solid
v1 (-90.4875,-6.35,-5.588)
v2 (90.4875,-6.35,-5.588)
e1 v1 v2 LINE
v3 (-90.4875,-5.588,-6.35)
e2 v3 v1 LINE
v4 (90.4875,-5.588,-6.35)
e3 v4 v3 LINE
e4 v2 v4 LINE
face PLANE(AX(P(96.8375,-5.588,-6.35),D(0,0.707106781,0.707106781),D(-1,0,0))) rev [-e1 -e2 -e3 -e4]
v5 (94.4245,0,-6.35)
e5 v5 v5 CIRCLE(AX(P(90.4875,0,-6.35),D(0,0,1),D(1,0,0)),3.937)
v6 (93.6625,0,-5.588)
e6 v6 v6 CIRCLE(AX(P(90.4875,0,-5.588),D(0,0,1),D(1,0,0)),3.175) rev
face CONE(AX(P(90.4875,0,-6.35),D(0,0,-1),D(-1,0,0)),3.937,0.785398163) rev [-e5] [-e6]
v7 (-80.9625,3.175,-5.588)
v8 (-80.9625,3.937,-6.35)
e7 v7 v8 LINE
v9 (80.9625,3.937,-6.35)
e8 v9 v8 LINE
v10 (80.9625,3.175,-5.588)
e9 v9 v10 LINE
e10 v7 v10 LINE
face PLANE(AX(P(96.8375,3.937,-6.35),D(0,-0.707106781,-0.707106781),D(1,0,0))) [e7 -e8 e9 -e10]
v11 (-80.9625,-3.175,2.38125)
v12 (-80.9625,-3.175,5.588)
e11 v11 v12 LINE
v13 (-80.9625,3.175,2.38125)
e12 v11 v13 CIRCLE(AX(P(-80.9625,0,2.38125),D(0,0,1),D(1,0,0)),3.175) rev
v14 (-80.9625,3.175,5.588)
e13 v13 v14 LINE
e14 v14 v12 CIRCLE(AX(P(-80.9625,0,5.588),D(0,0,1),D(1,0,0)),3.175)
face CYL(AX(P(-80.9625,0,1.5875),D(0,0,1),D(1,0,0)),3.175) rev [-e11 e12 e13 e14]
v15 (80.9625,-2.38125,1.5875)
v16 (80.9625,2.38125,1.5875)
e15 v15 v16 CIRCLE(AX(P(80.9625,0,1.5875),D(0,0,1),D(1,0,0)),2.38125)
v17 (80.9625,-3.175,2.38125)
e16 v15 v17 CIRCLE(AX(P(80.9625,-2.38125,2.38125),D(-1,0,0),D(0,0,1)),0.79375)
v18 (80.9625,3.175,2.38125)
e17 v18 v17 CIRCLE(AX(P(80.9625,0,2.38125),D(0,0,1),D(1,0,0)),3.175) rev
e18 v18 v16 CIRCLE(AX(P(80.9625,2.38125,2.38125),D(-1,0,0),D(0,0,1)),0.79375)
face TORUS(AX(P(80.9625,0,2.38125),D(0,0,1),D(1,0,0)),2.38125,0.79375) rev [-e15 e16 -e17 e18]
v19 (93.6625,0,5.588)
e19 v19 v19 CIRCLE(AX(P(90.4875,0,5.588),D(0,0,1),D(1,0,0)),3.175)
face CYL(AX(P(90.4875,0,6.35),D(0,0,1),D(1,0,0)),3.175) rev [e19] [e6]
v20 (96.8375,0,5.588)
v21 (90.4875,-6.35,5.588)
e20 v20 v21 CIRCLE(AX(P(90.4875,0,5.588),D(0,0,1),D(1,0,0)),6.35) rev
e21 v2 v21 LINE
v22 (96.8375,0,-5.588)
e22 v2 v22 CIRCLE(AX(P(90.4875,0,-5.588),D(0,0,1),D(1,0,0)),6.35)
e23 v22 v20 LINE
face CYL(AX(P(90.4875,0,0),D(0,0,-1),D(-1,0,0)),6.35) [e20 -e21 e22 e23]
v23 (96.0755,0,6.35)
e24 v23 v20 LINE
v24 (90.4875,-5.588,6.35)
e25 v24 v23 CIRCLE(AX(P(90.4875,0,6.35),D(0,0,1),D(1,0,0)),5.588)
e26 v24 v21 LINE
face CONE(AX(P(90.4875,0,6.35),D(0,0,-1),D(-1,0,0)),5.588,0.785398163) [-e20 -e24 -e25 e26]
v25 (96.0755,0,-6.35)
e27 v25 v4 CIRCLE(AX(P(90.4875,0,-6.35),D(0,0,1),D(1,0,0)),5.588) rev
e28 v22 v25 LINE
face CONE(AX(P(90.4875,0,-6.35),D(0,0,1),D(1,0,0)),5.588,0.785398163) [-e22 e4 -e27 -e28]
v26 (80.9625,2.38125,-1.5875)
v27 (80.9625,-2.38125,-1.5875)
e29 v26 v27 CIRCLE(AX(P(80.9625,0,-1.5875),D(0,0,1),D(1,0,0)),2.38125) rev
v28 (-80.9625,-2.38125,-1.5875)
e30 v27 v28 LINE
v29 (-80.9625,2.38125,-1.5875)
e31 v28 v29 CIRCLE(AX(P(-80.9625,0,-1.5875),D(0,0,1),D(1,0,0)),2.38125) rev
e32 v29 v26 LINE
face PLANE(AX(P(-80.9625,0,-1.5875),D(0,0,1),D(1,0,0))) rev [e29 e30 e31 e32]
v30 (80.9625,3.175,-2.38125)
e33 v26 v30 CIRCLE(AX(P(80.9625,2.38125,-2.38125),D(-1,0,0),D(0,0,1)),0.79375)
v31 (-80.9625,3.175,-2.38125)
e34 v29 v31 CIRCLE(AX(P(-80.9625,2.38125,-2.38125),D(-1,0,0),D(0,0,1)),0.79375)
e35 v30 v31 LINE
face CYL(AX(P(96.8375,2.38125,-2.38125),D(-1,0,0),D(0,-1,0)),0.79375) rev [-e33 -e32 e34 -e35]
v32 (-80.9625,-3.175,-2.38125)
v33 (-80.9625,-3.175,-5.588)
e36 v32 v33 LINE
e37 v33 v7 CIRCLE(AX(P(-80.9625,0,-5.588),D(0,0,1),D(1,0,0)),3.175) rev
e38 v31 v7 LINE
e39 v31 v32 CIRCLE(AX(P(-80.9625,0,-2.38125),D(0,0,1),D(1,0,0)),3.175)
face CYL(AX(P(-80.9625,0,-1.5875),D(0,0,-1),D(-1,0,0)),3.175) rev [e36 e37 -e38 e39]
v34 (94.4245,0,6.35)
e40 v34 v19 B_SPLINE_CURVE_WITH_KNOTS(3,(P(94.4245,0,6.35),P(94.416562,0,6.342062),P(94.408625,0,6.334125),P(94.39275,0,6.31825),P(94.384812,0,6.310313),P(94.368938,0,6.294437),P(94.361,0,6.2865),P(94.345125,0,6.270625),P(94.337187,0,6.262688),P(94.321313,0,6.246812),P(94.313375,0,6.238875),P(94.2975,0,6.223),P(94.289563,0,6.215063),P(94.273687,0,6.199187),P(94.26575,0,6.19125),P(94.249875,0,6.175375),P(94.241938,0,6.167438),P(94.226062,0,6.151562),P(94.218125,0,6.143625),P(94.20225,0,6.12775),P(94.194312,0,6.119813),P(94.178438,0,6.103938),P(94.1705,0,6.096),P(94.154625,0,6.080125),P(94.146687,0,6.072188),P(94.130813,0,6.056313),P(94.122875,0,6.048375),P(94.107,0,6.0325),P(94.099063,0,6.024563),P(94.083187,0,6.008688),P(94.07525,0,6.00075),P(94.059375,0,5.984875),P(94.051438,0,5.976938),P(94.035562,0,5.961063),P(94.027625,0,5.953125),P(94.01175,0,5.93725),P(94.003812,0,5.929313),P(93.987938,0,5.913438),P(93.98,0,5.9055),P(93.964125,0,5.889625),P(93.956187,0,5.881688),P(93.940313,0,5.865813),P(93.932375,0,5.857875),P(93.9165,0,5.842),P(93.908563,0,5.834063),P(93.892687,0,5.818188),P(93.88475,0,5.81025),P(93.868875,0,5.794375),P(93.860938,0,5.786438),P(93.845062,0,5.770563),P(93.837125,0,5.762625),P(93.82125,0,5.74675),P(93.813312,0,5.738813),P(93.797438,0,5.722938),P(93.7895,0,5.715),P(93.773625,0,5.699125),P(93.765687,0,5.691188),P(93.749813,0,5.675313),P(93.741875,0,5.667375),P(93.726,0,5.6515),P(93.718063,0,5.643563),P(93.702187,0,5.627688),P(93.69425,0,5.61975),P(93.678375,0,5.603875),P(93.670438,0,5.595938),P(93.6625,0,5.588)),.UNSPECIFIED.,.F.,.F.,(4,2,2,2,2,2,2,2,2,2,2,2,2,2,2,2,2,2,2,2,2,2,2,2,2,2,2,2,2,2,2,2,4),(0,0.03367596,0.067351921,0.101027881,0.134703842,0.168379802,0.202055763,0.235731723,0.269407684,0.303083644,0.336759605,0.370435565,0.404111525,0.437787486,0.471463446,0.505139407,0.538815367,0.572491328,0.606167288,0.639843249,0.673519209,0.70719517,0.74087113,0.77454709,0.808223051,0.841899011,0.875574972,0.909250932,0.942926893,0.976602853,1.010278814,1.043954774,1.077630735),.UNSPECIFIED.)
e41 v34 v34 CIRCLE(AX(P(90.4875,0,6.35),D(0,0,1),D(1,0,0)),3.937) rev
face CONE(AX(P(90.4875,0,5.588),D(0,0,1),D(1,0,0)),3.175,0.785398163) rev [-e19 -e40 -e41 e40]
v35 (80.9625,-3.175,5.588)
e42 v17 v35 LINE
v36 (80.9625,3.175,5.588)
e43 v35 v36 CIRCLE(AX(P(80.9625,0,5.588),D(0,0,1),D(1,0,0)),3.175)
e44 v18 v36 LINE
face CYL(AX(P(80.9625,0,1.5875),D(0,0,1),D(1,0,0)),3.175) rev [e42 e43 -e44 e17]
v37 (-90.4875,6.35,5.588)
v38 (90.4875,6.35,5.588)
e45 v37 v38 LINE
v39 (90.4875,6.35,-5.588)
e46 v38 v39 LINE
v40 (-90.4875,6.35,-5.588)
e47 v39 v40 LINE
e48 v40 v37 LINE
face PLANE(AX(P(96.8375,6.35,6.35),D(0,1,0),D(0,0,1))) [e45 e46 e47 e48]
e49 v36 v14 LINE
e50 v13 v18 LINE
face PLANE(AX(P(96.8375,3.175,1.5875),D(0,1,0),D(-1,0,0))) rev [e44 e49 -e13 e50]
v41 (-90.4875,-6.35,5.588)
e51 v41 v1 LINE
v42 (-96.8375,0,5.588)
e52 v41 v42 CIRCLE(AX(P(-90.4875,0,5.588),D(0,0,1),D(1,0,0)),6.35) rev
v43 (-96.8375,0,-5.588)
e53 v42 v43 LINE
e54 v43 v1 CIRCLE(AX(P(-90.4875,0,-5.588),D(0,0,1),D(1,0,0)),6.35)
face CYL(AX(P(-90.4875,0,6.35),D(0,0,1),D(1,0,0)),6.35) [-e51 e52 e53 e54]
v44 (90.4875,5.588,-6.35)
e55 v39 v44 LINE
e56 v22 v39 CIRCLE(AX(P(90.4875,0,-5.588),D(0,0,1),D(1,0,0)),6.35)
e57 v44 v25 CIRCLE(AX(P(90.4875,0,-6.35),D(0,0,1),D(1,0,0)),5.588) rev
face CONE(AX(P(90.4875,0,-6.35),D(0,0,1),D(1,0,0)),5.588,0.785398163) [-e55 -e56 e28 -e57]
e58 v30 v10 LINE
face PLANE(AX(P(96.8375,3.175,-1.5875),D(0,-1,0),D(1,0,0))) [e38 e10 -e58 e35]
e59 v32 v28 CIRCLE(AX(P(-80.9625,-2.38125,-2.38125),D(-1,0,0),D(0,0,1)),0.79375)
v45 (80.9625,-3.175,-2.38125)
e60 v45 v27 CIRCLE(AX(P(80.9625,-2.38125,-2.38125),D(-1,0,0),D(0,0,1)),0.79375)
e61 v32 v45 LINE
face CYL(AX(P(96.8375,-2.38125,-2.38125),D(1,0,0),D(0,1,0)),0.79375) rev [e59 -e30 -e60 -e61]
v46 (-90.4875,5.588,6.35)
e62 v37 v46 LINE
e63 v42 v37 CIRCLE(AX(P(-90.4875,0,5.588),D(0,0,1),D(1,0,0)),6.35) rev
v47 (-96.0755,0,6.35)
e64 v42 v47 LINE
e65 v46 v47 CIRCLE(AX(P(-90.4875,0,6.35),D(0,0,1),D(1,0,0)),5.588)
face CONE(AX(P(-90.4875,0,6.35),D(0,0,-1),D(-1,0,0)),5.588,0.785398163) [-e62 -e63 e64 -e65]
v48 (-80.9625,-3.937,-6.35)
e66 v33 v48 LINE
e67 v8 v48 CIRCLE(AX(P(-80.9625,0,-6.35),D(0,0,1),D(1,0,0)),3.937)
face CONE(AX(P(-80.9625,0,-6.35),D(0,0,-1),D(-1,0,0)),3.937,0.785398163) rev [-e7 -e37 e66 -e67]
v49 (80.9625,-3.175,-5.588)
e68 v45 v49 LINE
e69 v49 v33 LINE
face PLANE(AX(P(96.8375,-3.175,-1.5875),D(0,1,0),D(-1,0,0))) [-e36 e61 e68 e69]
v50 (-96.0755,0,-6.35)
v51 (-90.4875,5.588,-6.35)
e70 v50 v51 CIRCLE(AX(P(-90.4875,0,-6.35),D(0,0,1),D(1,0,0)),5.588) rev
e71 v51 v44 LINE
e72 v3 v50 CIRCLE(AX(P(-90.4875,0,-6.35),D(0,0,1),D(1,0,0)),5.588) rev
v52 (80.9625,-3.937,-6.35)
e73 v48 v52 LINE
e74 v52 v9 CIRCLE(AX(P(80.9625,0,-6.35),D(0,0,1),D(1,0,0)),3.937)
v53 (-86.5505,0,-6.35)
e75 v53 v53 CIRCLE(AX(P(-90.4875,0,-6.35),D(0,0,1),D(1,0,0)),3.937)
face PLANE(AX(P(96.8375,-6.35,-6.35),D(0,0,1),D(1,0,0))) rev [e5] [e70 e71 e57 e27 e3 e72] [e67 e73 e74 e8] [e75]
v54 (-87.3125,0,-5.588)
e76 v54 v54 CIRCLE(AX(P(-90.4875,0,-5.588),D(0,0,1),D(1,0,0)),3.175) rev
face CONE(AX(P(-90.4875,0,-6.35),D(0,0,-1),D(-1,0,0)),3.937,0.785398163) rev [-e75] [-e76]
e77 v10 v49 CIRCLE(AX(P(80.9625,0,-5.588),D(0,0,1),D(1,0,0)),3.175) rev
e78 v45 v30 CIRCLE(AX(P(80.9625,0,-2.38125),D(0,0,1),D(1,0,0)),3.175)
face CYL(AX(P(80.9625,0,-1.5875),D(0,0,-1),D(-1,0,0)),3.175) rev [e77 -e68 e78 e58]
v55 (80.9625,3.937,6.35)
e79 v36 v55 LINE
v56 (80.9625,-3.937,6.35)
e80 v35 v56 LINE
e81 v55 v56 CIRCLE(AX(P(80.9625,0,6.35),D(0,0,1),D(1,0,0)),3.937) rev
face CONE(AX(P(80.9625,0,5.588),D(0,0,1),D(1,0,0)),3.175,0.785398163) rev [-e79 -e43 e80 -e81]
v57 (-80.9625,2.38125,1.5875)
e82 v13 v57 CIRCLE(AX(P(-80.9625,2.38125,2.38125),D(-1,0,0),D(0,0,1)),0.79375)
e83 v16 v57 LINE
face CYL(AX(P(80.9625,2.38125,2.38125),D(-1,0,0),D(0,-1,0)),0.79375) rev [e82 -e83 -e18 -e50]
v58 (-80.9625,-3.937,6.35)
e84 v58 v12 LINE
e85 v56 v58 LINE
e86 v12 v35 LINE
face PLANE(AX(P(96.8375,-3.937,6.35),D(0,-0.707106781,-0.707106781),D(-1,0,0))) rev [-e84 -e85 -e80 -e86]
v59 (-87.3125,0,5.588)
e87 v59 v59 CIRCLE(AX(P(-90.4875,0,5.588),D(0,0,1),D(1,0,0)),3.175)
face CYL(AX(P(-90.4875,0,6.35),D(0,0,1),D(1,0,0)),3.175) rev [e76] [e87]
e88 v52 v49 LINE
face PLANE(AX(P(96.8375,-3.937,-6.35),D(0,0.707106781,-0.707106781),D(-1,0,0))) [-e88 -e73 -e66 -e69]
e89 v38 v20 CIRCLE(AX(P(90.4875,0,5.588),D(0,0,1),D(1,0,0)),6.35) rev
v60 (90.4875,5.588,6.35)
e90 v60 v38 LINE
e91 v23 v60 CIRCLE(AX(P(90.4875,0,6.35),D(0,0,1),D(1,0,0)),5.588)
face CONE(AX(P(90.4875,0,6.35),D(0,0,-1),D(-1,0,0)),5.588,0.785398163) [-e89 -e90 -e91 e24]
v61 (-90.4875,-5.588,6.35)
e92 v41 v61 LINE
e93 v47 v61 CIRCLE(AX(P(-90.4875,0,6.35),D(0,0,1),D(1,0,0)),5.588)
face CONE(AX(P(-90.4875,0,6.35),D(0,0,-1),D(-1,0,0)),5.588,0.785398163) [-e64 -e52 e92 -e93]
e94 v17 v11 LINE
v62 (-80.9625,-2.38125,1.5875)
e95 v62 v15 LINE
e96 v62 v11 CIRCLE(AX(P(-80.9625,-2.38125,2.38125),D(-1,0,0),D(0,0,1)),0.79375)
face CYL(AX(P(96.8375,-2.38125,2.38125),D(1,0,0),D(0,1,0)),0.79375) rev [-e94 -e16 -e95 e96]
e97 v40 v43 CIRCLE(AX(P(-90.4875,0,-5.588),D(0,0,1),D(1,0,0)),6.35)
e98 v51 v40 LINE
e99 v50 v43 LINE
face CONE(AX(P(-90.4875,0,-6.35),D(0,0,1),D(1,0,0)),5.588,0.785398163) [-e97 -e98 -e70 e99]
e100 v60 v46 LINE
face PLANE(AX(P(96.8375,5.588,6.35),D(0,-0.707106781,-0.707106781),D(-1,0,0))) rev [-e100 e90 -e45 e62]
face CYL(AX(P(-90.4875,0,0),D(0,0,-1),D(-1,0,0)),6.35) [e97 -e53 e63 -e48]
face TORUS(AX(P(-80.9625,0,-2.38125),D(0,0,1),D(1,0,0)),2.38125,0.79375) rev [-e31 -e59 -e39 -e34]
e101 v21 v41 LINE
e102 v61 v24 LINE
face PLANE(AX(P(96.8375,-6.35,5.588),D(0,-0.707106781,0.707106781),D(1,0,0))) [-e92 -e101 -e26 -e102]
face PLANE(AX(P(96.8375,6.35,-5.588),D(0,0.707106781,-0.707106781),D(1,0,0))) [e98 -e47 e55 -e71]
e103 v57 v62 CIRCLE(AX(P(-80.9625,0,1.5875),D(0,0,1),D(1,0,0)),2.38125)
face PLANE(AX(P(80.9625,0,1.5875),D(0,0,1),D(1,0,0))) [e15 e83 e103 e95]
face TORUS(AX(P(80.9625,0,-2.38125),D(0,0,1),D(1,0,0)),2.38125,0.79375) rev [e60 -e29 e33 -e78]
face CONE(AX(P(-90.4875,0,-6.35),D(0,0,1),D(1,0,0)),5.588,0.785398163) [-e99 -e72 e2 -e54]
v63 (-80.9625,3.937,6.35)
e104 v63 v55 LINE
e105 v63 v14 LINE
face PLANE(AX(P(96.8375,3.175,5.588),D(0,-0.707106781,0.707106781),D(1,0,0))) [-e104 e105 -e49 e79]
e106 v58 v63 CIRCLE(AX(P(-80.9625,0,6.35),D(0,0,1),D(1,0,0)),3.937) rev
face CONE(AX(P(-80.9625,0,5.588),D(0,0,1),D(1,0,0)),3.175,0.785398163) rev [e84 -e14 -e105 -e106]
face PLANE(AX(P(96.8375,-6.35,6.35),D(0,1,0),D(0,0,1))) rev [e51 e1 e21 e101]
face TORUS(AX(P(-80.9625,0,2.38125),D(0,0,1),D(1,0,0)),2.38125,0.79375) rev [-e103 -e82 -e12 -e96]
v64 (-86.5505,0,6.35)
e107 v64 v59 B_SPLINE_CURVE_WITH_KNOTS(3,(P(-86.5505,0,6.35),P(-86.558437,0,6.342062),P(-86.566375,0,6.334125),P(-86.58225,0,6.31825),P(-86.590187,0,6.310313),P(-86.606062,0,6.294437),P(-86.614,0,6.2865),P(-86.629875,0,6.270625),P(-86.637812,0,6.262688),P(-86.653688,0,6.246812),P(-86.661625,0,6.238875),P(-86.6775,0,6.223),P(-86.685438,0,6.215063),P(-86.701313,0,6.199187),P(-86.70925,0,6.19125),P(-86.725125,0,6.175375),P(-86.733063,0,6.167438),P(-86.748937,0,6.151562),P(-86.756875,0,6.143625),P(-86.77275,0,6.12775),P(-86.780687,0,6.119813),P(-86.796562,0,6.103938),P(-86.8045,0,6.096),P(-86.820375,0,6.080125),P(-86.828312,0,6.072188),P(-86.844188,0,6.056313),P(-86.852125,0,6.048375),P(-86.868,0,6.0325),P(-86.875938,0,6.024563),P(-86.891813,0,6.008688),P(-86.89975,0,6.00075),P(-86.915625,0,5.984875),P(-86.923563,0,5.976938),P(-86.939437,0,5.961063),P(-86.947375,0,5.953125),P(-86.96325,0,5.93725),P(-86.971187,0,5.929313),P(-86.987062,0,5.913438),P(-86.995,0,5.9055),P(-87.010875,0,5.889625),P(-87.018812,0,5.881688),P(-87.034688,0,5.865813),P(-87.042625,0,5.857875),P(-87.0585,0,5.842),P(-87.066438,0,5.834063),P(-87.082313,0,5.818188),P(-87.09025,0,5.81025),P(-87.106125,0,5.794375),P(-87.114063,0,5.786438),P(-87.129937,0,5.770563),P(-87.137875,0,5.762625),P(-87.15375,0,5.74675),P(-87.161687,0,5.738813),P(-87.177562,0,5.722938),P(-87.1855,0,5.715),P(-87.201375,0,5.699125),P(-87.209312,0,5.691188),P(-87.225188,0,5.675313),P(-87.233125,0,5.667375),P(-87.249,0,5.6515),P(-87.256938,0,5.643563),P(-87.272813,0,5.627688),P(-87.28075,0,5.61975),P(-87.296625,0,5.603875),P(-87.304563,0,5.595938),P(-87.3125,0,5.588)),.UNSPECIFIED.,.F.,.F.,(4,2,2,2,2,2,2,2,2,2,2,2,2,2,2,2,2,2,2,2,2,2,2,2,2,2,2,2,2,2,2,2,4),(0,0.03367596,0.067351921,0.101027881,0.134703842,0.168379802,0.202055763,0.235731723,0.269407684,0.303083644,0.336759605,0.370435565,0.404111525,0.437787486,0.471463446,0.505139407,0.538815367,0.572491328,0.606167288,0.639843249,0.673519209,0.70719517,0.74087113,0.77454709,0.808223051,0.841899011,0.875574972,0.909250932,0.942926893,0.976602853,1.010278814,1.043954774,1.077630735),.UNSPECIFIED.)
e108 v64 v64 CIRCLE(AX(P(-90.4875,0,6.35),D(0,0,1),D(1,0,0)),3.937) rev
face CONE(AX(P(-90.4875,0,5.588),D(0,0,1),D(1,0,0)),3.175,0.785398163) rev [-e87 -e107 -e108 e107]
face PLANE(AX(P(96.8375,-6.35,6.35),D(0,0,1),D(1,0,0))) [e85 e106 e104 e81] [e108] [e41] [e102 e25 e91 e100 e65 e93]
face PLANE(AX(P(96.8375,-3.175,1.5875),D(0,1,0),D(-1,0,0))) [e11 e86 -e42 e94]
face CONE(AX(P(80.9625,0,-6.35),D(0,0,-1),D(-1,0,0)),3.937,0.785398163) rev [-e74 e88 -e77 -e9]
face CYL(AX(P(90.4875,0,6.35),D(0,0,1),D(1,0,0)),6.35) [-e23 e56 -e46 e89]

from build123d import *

# Parameters (mm, degrees)
SKETCH1_W                   = 12.7
SKETCH1_H                   = 12.7
BOSS_EXTRUDE1_DEPTH         = 96.8375
F_1_4_0_25_DIAMETER_HOLE1_D = 6.35
CUT_EXTRUDE1_START          = 6.35
CUT_EXTRUDE1_DEPTH          = 4.7625
CUT_EXTRUDE2_START          = -1.5875
CUT_EXTRUDE2_DEPTH          = 4.7625
FILLET1_R                   = 6.35
FILLET2_R                   = 0.79375
CHAMFER1_SIZE               = 0.762


with BuildPart() as part:
    # Sketch1 → Boss-Extrude1 (new, symmetric)
    with BuildSketch(Plane(origin=(0, 0, 0), x_dir=(0, 0, -1), z_dir=(1, 0, 0))):
        Rectangle(SKETCH1_W, SKETCH1_H)
    extrude(amount=BOSS_EXTRUDE1_DEPTH, both=True)

    # 1/4 (0.25) Diameter Hole1 (through all)
    with Locations(Plane.XY.offset(6.35)):
        with Locations((-90.4875, 0), (90.4875, 0)):
            Hole(F_1_4_0_25_DIAMETER_HOLE1_D / 2)

    # Sketch6 → Cut-Extrude1 (cut)
    with BuildSketch(Plane.XY.offset(CUT_EXTRUDE1_START)):
        with BuildLine():
            Line((-80.9625, 3.175), (80.9625, 3.175))
            ThreePointArc((80.9625, 3.175), (84.1375, 0), (80.9625, -3.175))
            Line((80.9625, -3.175), (-80.9625, -3.175))
            ThreePointArc((-80.9625, -3.175), (-84.1375, 0), (-80.9625, 3.175))
        make_face()
    extrude(amount=-CUT_EXTRUDE1_DEPTH, mode=Mode.SUBTRACT)

    # Sketch6<3> → Cut-Extrude2 (cut)
    with BuildSketch(Plane.XY.offset(CUT_EXTRUDE2_START)):
        with BuildLine():
            Line((-80.9625, 3.175), (80.9625, 3.175))
            ThreePointArc((80.9625, 3.175), (84.1375, 0), (80.9625, -3.175))
            Line((80.9625, -3.175), (-80.9625, -3.175))
            ThreePointArc((-80.9625, -3.175), (-84.1375, 0), (-80.9625, 3.175))
        make_face()
    extrude(amount=-CUT_EXTRUDE2_DEPTH, mode=Mode.SUBTRACT)

    # Fillet1
    fillet1_edges = [part.edges().sort_by_distance(p)[0] for p in [
        (96.8375, -6.35, 0),
        (96.8375, 6.35, 0),
        (-96.8375, -6.35, 0),
        (-96.8375, 6.35, 0),
    ]]
    fillet(fillet1_edges, radius=FILLET1_R - 0.0001)  # a hair under: the kernel refuses the full size

    # Fillet2
    fillet2_edges = [part.edges().sort_by_distance(p)[0] for p in [
        (84.1375, 0, 1.5875),
        (-84.1375, 0, 1.5875),
        (0, 3.175, 1.5875),
        (0, -3.175, 1.5875),
        (0, 3.175, -1.5875),
        (-84.1375, 0, -1.5875),
        (0, -3.175, -1.5875),
        (84.1375, 0, -1.5875),
    ]]
    fillet(fillet2_edges, radius=FILLET2_R)

    # Chamfer1
    chamfer1_edges = [part.edges().sort_by_distance(p)[0] for p in [
        (93.6625, 0, 6.35),
        (93.6625, 0, -6.35),
        (-87.3125, 0, 6.35),
        (-87.3125, 0, -6.35),
        (0, -3.175, 6.35),
        (84.1375, 0, 6.35),
        (0, 3.175, 6.35),
        (-84.1375, 0, 6.35),
        (0, 3.175, -6.35),
        (-84.1375, 0, -6.35),
        (0, -3.175, -6.35),
        (84.1375, 0, -6.35),
        (0, 6.35, -6.35),
        (0, -6.35, -6.35),
        (-94.97765735, 4.49015735, -6.35),
        (-94.97765735, -4.49015735, -6.35),
        (94.97765735, 4.49015735, -6.35),
        (94.97765735, -4.49015735, -6.35),
        (0, -6.35, 6.35),
        (0, 6.35, 6.35),
        (-94.97765735, 4.49015735, 6.35),
        (-94.97765735, -4.49015735, 6.35),
        (94.97765735, 4.49015735, 6.35),
        (94.97765735, -4.49015735, 6.35),
    ]]
    chamfer(chamfer1_edges, length=CHAMFER1_SIZE)


solid = part.part
